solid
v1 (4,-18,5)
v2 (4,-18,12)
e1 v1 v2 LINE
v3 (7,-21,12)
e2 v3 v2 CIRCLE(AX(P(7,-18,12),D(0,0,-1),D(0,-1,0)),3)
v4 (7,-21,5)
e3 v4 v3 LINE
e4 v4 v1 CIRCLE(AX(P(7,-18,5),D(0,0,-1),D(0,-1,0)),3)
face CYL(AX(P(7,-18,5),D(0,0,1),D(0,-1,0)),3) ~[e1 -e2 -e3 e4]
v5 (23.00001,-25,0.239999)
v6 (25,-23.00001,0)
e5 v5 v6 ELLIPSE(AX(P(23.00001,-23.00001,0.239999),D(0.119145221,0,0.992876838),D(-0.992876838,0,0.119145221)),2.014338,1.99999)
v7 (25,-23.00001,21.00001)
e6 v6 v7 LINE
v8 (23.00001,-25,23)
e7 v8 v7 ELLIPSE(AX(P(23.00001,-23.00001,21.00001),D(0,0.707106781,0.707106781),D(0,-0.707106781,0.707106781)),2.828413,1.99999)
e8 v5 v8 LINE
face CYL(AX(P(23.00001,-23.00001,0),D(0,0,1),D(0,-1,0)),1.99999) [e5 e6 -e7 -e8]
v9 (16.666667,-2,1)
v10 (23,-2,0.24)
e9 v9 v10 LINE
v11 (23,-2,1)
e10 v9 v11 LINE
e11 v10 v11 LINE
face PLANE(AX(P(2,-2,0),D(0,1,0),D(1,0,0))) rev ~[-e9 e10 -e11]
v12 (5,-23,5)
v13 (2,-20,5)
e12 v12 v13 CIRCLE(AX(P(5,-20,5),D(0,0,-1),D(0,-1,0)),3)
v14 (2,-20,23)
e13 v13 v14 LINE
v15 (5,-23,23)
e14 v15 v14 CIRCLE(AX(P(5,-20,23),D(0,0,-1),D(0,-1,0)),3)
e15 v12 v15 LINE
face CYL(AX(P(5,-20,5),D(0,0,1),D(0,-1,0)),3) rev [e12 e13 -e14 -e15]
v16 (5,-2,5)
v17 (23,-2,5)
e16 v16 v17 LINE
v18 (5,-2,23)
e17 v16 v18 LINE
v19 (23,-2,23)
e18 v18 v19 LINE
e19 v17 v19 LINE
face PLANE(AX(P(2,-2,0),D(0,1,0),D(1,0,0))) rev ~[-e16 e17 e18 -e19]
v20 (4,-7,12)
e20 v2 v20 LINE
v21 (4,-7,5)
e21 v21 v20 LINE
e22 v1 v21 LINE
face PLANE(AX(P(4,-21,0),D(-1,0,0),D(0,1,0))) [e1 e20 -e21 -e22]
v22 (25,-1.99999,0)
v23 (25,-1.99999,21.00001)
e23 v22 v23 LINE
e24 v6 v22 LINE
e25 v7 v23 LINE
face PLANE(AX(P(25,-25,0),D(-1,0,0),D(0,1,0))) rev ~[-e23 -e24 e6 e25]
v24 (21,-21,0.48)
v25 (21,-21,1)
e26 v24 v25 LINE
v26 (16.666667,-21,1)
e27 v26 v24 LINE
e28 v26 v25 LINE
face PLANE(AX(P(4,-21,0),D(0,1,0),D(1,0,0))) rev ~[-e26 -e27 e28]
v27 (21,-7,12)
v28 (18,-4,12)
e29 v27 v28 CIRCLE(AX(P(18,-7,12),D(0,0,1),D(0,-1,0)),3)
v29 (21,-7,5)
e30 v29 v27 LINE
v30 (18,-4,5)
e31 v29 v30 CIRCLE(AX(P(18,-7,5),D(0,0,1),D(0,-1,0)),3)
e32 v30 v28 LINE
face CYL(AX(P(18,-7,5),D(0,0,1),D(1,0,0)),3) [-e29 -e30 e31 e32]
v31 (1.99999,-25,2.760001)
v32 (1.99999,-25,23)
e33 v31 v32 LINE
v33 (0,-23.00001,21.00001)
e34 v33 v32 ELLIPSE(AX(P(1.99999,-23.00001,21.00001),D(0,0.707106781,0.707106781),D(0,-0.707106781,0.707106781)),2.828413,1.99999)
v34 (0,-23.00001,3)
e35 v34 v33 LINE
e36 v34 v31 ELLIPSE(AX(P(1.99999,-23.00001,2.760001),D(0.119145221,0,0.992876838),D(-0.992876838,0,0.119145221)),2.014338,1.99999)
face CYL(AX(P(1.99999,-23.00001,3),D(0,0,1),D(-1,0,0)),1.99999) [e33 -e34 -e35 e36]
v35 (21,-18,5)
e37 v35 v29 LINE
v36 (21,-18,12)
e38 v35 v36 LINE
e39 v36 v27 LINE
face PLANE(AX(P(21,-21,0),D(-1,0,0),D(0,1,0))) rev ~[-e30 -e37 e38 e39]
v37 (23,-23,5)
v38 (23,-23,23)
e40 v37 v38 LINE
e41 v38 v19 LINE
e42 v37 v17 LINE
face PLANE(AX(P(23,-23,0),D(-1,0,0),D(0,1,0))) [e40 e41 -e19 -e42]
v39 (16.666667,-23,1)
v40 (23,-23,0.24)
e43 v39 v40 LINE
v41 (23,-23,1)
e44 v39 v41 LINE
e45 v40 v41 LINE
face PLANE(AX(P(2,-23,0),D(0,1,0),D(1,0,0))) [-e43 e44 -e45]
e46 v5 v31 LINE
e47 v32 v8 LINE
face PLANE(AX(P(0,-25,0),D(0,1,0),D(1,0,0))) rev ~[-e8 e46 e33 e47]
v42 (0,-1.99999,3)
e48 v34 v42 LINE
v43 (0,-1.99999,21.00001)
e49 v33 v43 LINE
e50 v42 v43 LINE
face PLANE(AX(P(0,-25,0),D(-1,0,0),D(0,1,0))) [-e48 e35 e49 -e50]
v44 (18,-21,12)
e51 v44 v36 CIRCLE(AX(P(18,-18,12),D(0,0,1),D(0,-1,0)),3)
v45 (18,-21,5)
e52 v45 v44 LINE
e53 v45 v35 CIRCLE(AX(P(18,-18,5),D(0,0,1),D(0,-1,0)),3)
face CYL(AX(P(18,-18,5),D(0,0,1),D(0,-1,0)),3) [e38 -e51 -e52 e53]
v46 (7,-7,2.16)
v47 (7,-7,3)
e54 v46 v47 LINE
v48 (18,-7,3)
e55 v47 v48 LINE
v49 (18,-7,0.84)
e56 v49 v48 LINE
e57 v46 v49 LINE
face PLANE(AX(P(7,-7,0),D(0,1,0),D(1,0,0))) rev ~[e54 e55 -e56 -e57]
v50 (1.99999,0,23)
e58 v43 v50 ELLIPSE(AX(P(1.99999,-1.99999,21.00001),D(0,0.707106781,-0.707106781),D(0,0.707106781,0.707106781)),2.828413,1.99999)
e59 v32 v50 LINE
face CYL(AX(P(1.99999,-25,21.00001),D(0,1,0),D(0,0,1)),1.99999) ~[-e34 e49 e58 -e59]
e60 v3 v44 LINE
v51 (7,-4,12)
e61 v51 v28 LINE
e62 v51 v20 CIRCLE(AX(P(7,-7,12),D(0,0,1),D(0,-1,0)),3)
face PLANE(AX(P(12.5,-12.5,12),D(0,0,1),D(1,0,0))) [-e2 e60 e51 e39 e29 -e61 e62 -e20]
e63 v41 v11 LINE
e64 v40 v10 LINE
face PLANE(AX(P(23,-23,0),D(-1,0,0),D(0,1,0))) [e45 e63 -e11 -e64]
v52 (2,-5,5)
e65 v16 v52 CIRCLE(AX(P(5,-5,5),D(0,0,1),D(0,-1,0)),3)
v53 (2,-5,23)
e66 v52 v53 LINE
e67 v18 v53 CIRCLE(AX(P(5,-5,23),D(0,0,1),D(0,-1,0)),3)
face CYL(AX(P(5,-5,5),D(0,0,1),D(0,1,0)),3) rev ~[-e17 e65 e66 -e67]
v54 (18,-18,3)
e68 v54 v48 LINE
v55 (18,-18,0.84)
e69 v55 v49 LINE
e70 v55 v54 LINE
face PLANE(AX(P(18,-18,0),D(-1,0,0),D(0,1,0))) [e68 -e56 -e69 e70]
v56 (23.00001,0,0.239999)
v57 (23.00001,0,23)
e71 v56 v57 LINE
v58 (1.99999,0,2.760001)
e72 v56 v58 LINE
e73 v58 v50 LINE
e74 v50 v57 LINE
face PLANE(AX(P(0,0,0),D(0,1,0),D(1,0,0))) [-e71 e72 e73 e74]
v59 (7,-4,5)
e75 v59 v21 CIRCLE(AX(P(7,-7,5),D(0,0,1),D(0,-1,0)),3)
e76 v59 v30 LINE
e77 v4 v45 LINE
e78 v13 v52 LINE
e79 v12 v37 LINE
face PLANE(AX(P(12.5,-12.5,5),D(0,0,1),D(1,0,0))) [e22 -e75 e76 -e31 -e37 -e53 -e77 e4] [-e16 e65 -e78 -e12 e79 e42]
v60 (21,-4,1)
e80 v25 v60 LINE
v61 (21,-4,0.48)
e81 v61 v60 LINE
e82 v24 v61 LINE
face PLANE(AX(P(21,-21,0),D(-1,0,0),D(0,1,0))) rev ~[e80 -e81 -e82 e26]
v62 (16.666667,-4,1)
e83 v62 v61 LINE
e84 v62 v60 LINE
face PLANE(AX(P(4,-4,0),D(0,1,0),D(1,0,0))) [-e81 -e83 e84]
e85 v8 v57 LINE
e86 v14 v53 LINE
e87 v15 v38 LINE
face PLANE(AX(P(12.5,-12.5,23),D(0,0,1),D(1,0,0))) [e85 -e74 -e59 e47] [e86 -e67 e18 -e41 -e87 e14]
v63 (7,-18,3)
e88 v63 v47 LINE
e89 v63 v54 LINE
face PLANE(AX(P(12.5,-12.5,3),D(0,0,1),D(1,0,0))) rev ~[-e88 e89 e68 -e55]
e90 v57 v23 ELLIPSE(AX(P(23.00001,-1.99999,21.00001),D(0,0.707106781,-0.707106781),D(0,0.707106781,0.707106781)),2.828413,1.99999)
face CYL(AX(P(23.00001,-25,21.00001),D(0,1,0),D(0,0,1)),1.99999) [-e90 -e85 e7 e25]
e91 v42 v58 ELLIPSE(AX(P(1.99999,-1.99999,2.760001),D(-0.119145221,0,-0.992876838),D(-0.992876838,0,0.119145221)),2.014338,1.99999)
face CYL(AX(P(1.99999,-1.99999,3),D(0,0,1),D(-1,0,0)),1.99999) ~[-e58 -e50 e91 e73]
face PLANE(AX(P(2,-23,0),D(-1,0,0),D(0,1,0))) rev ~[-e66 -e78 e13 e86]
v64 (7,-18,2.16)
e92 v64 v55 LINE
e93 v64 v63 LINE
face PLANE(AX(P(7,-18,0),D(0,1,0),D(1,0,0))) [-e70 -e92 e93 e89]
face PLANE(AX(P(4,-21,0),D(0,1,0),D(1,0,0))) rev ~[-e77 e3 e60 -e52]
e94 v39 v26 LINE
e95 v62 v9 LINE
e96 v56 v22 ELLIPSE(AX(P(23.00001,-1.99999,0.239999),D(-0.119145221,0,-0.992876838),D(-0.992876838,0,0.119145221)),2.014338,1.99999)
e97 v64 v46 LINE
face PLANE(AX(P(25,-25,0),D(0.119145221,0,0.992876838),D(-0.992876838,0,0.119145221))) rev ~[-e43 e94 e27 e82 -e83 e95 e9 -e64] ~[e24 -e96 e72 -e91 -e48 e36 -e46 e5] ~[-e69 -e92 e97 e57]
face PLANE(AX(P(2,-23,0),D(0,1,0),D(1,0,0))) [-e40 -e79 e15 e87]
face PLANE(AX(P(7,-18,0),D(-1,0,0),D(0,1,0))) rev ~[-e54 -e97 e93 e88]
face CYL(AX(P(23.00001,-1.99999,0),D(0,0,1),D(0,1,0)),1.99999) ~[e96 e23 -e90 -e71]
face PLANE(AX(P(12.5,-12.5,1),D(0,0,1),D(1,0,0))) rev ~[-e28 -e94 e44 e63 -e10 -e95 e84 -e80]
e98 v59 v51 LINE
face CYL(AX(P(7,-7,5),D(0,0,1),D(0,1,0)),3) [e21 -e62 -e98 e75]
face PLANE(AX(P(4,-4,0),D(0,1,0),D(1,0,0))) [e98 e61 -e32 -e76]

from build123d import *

# Parameters (mm, degrees)
F0_W     = 25
F0_H     = 25
F0_W_2   = 21
F0_H_2   = 21
F1_DEPTH = 23
F0_W_3   = 17
F0_H_3   = 17
F2_DEPTH = 5
F0_W_4   = 11
F0_H_4   = 11
F3_DEPTH = 12
F4_DEPTH = 3
F5_DEPTH = 1
F7_DEPTH = 25
F8_R     = 1.99999
F9_R     = 3


# Not quite as in the source:
# - a fillet or chamfer is up to 0.001 mm smaller than in the source, because OpenCascade refuses the exact size


with BuildPart() as f1:
    # F0 (on Top) → F1 (new body)
    with BuildSketch(Plane.XY):
        with Locations((12.5, -12.5)):
            Rectangle(F0_W, F0_H)
        with Locations((12.5, -12.5)):
            Rectangle(F0_W_2, F0_H_2, mode=Mode.SUBTRACT)
    extrude(amount=F1_DEPTH)

    # F0 (on Top) → F2 (join)
    with BuildSketch(Plane.XY):
        with Locations((12.5, -12.5)):
            Rectangle(F0_W_2, F0_H_2)
        with Locations((12.5, -12.5)):
            Rectangle(F0_W_3, F0_H_3, mode=Mode.SUBTRACT)
    extrude(amount=F2_DEPTH)

    # F0 (on Top) → F3 (join)
    with BuildSketch(Plane.XY):
        with Locations((12.5, -12.5)):
            Rectangle(F0_W_3, F0_H_3)
        with Locations((12.5, -12.5)):
            Rectangle(F0_W_4, F0_H_4, mode=Mode.SUBTRACT)
        with Locations((12.5, -12.5)):
            Rectangle(F0_W_4, F0_H_4)
    extrude(amount=F3_DEPTH)

    # F0 (on Top) → F4 (cut)
    with BuildSketch(Plane.XY):
        with Locations((12.5, -12.5)):
            Rectangle(F0_W_4, F0_H_4)
    extrude(amount=F4_DEPTH, mode=Mode.SUBTRACT)

    # F0 (on Top) → F5 (cut)
    with BuildSketch(Plane.XY):
        with Locations((12.5, -12.5)):
            Rectangle(F0_W_2, F0_H_2)
        with Locations((12.5, -12.5)):
            Rectangle(F0_W_3, F0_H_3, mode=Mode.SUBTRACT)
    extrude(amount=F5_DEPTH, mode=Mode.SUBTRACT)

    # F6 (on face) → F7 (cut, through all)
    with BuildSketch(Plane.XZ.offset(25)):
        Polygon((25, 0), (0, 3), (0, 0), align=None)
    extrude(amount=-F7_DEPTH, mode=Mode.SUBTRACT)

    # F8 (radius 2 in the source; OpenCascade refuses exactly that, so slightly less here)
    f8_edges = [f1.edges().sort_by_distance(p)[0] for p in [
        (25, -25, 11.5),
        (0, -25, 13),
        (0, 0, 13),
        (25, 0, 11.5),
        (0, -12.5, 23),
        (25, -12.5, 23),
    ]]
    fillet(f8_edges, radius=F8_R)

    # F9
    f9_edges = [f1.edges().sort_by_distance(p)[0] for p in [
        (2, -2, 14),
        (4, -4, 8.5),
        (21, -4, 8.5),
        (21, -21, 8.5),
        (4, -21, 8.5),
        (2, -23, 14),
    ]]
    fillet(f9_edges, radius=F9_R)


solid = f1.part
